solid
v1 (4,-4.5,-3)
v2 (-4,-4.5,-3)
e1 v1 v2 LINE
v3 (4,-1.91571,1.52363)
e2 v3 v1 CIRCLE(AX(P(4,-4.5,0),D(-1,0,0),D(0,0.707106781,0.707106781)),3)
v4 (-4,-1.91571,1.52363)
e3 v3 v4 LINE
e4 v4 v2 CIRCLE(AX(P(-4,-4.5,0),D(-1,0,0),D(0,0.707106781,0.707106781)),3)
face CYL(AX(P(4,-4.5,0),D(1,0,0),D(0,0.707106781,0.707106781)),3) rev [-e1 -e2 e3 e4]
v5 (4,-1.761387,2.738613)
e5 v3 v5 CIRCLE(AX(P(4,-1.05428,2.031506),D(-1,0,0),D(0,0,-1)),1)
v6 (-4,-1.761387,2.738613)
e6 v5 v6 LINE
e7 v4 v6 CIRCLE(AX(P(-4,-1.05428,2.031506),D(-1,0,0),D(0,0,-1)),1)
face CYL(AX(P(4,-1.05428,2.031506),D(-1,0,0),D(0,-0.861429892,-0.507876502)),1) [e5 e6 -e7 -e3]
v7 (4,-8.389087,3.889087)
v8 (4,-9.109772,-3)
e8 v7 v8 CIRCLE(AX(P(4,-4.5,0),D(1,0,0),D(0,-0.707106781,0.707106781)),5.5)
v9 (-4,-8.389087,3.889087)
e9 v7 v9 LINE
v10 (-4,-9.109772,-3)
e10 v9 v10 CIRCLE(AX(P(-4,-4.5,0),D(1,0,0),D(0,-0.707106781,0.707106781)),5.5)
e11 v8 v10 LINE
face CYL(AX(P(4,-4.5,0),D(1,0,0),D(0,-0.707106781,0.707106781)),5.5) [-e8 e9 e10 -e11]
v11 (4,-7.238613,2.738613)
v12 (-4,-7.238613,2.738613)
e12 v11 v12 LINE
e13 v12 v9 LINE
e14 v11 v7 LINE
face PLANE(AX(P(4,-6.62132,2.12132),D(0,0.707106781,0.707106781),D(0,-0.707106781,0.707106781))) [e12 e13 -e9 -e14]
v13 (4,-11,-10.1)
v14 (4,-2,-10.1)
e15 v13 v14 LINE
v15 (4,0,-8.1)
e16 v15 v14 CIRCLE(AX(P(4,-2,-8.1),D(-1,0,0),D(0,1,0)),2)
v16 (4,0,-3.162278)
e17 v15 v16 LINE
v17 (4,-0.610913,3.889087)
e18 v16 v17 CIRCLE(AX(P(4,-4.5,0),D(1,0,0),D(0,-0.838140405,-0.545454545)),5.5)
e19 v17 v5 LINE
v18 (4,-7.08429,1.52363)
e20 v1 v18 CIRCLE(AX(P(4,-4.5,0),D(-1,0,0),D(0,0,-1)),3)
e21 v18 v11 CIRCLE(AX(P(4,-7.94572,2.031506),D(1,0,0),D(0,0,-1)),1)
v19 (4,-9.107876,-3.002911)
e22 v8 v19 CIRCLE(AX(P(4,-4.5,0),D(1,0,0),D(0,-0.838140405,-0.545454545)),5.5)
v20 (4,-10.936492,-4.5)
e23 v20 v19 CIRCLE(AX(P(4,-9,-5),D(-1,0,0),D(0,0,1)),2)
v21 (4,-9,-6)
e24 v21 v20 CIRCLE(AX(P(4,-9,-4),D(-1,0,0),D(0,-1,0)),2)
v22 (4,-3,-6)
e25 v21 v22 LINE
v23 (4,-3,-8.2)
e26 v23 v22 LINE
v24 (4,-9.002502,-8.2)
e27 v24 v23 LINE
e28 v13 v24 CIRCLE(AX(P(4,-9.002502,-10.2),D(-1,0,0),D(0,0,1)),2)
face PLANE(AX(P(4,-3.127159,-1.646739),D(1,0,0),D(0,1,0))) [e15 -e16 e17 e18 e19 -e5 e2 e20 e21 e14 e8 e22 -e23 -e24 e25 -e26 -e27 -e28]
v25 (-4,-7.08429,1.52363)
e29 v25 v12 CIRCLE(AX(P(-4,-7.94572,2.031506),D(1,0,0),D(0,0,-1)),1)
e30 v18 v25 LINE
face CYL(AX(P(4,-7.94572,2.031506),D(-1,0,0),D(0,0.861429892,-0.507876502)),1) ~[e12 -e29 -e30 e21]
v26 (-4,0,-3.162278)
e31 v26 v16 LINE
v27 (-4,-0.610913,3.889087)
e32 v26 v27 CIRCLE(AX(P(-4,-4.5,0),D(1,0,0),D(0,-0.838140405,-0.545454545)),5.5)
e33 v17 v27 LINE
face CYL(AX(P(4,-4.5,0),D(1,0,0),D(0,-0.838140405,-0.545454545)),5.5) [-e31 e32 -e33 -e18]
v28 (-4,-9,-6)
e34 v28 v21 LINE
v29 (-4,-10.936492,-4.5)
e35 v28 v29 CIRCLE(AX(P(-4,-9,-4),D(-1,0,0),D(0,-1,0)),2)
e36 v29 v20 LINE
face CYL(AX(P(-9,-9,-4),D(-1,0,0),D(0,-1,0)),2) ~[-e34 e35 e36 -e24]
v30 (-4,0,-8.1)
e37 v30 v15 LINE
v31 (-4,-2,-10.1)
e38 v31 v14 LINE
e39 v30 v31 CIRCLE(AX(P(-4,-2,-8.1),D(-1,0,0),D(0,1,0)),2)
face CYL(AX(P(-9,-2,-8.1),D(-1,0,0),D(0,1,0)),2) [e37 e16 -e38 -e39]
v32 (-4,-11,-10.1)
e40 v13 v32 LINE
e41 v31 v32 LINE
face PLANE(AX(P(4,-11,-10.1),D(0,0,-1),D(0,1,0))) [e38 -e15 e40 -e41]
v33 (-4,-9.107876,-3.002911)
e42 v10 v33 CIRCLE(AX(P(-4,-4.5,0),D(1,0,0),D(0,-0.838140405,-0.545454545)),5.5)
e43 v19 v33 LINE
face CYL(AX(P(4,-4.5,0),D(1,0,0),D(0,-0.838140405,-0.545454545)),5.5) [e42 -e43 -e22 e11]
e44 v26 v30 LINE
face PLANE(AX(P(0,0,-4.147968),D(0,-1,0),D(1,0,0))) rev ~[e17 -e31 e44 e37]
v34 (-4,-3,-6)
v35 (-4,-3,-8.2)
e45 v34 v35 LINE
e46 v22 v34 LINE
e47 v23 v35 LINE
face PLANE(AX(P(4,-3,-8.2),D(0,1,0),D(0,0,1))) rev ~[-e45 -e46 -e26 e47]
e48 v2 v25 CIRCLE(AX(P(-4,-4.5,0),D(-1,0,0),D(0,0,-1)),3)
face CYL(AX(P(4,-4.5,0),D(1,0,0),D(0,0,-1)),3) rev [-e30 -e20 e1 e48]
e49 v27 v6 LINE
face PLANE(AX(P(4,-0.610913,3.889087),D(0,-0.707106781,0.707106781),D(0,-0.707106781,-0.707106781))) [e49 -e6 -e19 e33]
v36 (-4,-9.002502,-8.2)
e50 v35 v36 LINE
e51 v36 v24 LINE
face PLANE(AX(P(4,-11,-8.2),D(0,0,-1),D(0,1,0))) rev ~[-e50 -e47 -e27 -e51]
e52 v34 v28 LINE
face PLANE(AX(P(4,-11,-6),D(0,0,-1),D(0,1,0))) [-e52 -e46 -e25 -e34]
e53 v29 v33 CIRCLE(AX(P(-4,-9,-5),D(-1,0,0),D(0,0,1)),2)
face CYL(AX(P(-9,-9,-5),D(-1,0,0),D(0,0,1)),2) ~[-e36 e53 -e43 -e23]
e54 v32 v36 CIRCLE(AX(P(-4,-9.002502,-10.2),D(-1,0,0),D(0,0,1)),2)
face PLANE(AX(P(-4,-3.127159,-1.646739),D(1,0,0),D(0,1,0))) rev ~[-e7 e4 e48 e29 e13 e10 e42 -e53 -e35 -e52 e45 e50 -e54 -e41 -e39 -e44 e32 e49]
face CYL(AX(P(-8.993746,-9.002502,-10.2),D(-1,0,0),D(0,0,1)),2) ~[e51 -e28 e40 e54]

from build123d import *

# Parameters (mm, degrees)
F1_DEPTH    = 4
F2_T1_DEPTH = 10.764079149
F3_W        = 8
F3_H        = 10
F4_DEPTH    = 7
F5_W        = 8
F5_H        = 2.2
F5_W_2      = 11
F5_H_2      = 2.9
F6_DEPTH    = 25
F7_T1_DEPTH = 18
F7_T3_DEPTH = 17.9874921777
F8_W        = 10.9849025458
F8_H        = 7.8663821071
F9_DEPTH    = 25
F11_DEPTH   = 8
F12_R       = 1


# Not quite as in the source:
# - a fillet or chamfer that OpenCascade refuses, or shapes differently, is made with other operations: its cross-section is extruded or revolved along the edge and cut away or added


with BuildPart() as f1:
    # F0 (on Front) → F1 (new body)
    with BuildSketch(Plane.XZ):
        with BuildLine():
            Line((-1.02606043, 2.8190778624), (-1.3680805733, 3.7587704831))
            ThreePointArc((-1.3680805733, 3.7587704831), (-3.2766081772, 2.2943057454), (-4, 0))
            Line((-4, 0), (-4, -8))
            Line((-4, -8), (-4, -13))
            Line((-4, -13), (4, -13))
            Line((4, -13), (4, -3))
            Line((4, -3), (4, 0))
            ThreePointArc((4, 0), (3.2766081772, 2.2943057454), (1.3680805733, 3.7587704831))
            Line((1.3680805733, 3.7587704831), (1.02606043, 2.8190778624))
            ThreePointArc((1.02606043, 2.8190778624), (0, -3), (-1.02606043, 2.8190778624))
        make_face()
    extrude(amount=F1_DEPTH)

    # F2: fillet of radius 1 on 2 edges, made by hand

    # F2_s2 → F2_t1 (cut)
    with BuildSketch(Plane.XZ.offset(-3.3820395745)):
        with BuildLine():
            ThreePointArc((-2.5427622285, 3.087775939), (-1.6437981614, 3.280553188), (-0.9673790506, 2.6578520976))
            Line((-0.9673790506, 2.6578520976), (-1.3680805733, 3.7587704831))
            ThreePointArc((-1.3680805733, 3.7587704831), (-1.9839937688, 3.4732936423), (-2.5427622285, 3.087775939))
        make_face()
        with BuildLine():
            ThreePointArc((2.5427622285, 3.087775939), (1.6437981614, 3.280553188), (0.9673790506, 2.6578520976))
            Line((0.9673790506, 2.6578520976), (1.3680805733, 3.7587704831))
            ThreePointArc((1.3680805733, 3.7587704831), (1.9839937688, 3.4732936423), (2.5427622285, 3.087775939))
        make_face()
    extrude(amount=F2_T1_DEPTH, mode=Mode.SUBTRACT)

    # F3 (on face) → F4 (join)
    with BuildSketch(Plane.XZ.offset(4)):
        with Locations((0, -8)):
            Rectangle(F3_W, F3_H)
    extrude(amount=F4_DEPTH)

    # F5 (on face) → F6 (cut)
    with BuildSketch(Plane.YZ.offset(4)):
        with Locations((-7, -7.1)):
            Rectangle(F5_W, F5_H)
        with Locations((-5.5, -11.55)):
            Rectangle(F5_W_2, F5_H_2)
    extrude(amount=-F6_DEPTH, mode=Mode.SUBTRACT)

    # F7: fillet of radius 2 on 4 edges, made by hand

    # F7_s2 → F7_t1 (cut)
    with BuildSketch(Plane.YZ.offset(-9)):
        with BuildLine():
            ThreePointArc((-11, -4), (-10.4142135624, -5.4142135624), (-9, -6))
            Line((-9, -6), (-11, -6))
            Line((-11, -6), (-11, -4))
        make_face()
        with BuildLine():
            ThreePointArc((-9, -3), (-10.4142135624, -3.5857864376), (-11, -5))
            Line((-11, -5), (-11, -3))
            Line((-11, -3), (-9, -3))
        make_face()
        with BuildLine():
            ThreePointArc((0, -8.1), (-0.5857864376, -9.5142135624), (-2, -10.1))
            Line((-2, -10.1), (0, -10.1))
            Line((0, -10.1), (0, -8.1))
        make_face()
    extrude(amount=F7_T1_DEPTH, mode=Mode.SUBTRACT)

    # F7_s4 → F7_t3 (cut)
    with BuildSketch(Plane.YZ.offset(-8.9937460889)):
        with BuildLine():
            ThreePointArc((-9.0025015645, -8.2), (-10.3809064397, -8.7508623254), (-11, -10.1))
            Line((-11, -10.1), (-11, -8.2))
            Line((-11, -8.2), (-9.0025015645, -8.2))
        make_face()
    extrude(amount=F7_T3_DEPTH, mode=Mode.SUBTRACT)

    # F8 (on face) → F9 (cut)
    with BuildSketch(Plane.XZ.offset(4)):
        with Locations((-1.4924512729, 0.9331910536)):
            Rectangle(F8_W, F8_H)
    extrude(amount=-F9_DEPTH, mode=Mode.SUBTRACT)

    # F10 (on face) → F11 (join, through all)
    with BuildSketch(Plane.YZ.offset(4)):
        with BuildLine():
            ThreePointArc((-2.3786796564, 2.1213203436), (-1.7283614025, -1.1480502971), (-4.5, -3))
            Line((-4.5, -3), (-9.1097722286, -3))
            ThreePointArc((-9.1097722286, -3), (-1.0366594684, -4.2726189114), (-0.6109127035, 3.8890872965))
            Line((-0.6109127035, 3.8890872965), (-2.3786796564, 2.1213203436))
        make_face()
        with BuildLine():
            Line((-9.1097722286, -3), (-4.5, -3))
            ThreePointArc((-4.5, -3), (-7.2716385975, -1.1480502971), (-6.6213203436, 2.1213203436))
            Line((-6.6213203436, 2.1213203436), (-8.3890872965, 3.8890872965))
            ThreePointArc((-8.3890872965, 3.8890872965), (-9.9701493811, 0.5722462303), (-9.1097722286, -3))
        make_face()
    extrude(amount=-F11_DEPTH)

    # F12
    f12_edges = [f1.edges().sort_by_distance(p)[0] for p in [
        (0, -2.37868, 2.12132),
        (0, -6.62132, 2.12132),
    ]]
    fillet(f12_edges, radius=F12_R)


solid = f1.part
